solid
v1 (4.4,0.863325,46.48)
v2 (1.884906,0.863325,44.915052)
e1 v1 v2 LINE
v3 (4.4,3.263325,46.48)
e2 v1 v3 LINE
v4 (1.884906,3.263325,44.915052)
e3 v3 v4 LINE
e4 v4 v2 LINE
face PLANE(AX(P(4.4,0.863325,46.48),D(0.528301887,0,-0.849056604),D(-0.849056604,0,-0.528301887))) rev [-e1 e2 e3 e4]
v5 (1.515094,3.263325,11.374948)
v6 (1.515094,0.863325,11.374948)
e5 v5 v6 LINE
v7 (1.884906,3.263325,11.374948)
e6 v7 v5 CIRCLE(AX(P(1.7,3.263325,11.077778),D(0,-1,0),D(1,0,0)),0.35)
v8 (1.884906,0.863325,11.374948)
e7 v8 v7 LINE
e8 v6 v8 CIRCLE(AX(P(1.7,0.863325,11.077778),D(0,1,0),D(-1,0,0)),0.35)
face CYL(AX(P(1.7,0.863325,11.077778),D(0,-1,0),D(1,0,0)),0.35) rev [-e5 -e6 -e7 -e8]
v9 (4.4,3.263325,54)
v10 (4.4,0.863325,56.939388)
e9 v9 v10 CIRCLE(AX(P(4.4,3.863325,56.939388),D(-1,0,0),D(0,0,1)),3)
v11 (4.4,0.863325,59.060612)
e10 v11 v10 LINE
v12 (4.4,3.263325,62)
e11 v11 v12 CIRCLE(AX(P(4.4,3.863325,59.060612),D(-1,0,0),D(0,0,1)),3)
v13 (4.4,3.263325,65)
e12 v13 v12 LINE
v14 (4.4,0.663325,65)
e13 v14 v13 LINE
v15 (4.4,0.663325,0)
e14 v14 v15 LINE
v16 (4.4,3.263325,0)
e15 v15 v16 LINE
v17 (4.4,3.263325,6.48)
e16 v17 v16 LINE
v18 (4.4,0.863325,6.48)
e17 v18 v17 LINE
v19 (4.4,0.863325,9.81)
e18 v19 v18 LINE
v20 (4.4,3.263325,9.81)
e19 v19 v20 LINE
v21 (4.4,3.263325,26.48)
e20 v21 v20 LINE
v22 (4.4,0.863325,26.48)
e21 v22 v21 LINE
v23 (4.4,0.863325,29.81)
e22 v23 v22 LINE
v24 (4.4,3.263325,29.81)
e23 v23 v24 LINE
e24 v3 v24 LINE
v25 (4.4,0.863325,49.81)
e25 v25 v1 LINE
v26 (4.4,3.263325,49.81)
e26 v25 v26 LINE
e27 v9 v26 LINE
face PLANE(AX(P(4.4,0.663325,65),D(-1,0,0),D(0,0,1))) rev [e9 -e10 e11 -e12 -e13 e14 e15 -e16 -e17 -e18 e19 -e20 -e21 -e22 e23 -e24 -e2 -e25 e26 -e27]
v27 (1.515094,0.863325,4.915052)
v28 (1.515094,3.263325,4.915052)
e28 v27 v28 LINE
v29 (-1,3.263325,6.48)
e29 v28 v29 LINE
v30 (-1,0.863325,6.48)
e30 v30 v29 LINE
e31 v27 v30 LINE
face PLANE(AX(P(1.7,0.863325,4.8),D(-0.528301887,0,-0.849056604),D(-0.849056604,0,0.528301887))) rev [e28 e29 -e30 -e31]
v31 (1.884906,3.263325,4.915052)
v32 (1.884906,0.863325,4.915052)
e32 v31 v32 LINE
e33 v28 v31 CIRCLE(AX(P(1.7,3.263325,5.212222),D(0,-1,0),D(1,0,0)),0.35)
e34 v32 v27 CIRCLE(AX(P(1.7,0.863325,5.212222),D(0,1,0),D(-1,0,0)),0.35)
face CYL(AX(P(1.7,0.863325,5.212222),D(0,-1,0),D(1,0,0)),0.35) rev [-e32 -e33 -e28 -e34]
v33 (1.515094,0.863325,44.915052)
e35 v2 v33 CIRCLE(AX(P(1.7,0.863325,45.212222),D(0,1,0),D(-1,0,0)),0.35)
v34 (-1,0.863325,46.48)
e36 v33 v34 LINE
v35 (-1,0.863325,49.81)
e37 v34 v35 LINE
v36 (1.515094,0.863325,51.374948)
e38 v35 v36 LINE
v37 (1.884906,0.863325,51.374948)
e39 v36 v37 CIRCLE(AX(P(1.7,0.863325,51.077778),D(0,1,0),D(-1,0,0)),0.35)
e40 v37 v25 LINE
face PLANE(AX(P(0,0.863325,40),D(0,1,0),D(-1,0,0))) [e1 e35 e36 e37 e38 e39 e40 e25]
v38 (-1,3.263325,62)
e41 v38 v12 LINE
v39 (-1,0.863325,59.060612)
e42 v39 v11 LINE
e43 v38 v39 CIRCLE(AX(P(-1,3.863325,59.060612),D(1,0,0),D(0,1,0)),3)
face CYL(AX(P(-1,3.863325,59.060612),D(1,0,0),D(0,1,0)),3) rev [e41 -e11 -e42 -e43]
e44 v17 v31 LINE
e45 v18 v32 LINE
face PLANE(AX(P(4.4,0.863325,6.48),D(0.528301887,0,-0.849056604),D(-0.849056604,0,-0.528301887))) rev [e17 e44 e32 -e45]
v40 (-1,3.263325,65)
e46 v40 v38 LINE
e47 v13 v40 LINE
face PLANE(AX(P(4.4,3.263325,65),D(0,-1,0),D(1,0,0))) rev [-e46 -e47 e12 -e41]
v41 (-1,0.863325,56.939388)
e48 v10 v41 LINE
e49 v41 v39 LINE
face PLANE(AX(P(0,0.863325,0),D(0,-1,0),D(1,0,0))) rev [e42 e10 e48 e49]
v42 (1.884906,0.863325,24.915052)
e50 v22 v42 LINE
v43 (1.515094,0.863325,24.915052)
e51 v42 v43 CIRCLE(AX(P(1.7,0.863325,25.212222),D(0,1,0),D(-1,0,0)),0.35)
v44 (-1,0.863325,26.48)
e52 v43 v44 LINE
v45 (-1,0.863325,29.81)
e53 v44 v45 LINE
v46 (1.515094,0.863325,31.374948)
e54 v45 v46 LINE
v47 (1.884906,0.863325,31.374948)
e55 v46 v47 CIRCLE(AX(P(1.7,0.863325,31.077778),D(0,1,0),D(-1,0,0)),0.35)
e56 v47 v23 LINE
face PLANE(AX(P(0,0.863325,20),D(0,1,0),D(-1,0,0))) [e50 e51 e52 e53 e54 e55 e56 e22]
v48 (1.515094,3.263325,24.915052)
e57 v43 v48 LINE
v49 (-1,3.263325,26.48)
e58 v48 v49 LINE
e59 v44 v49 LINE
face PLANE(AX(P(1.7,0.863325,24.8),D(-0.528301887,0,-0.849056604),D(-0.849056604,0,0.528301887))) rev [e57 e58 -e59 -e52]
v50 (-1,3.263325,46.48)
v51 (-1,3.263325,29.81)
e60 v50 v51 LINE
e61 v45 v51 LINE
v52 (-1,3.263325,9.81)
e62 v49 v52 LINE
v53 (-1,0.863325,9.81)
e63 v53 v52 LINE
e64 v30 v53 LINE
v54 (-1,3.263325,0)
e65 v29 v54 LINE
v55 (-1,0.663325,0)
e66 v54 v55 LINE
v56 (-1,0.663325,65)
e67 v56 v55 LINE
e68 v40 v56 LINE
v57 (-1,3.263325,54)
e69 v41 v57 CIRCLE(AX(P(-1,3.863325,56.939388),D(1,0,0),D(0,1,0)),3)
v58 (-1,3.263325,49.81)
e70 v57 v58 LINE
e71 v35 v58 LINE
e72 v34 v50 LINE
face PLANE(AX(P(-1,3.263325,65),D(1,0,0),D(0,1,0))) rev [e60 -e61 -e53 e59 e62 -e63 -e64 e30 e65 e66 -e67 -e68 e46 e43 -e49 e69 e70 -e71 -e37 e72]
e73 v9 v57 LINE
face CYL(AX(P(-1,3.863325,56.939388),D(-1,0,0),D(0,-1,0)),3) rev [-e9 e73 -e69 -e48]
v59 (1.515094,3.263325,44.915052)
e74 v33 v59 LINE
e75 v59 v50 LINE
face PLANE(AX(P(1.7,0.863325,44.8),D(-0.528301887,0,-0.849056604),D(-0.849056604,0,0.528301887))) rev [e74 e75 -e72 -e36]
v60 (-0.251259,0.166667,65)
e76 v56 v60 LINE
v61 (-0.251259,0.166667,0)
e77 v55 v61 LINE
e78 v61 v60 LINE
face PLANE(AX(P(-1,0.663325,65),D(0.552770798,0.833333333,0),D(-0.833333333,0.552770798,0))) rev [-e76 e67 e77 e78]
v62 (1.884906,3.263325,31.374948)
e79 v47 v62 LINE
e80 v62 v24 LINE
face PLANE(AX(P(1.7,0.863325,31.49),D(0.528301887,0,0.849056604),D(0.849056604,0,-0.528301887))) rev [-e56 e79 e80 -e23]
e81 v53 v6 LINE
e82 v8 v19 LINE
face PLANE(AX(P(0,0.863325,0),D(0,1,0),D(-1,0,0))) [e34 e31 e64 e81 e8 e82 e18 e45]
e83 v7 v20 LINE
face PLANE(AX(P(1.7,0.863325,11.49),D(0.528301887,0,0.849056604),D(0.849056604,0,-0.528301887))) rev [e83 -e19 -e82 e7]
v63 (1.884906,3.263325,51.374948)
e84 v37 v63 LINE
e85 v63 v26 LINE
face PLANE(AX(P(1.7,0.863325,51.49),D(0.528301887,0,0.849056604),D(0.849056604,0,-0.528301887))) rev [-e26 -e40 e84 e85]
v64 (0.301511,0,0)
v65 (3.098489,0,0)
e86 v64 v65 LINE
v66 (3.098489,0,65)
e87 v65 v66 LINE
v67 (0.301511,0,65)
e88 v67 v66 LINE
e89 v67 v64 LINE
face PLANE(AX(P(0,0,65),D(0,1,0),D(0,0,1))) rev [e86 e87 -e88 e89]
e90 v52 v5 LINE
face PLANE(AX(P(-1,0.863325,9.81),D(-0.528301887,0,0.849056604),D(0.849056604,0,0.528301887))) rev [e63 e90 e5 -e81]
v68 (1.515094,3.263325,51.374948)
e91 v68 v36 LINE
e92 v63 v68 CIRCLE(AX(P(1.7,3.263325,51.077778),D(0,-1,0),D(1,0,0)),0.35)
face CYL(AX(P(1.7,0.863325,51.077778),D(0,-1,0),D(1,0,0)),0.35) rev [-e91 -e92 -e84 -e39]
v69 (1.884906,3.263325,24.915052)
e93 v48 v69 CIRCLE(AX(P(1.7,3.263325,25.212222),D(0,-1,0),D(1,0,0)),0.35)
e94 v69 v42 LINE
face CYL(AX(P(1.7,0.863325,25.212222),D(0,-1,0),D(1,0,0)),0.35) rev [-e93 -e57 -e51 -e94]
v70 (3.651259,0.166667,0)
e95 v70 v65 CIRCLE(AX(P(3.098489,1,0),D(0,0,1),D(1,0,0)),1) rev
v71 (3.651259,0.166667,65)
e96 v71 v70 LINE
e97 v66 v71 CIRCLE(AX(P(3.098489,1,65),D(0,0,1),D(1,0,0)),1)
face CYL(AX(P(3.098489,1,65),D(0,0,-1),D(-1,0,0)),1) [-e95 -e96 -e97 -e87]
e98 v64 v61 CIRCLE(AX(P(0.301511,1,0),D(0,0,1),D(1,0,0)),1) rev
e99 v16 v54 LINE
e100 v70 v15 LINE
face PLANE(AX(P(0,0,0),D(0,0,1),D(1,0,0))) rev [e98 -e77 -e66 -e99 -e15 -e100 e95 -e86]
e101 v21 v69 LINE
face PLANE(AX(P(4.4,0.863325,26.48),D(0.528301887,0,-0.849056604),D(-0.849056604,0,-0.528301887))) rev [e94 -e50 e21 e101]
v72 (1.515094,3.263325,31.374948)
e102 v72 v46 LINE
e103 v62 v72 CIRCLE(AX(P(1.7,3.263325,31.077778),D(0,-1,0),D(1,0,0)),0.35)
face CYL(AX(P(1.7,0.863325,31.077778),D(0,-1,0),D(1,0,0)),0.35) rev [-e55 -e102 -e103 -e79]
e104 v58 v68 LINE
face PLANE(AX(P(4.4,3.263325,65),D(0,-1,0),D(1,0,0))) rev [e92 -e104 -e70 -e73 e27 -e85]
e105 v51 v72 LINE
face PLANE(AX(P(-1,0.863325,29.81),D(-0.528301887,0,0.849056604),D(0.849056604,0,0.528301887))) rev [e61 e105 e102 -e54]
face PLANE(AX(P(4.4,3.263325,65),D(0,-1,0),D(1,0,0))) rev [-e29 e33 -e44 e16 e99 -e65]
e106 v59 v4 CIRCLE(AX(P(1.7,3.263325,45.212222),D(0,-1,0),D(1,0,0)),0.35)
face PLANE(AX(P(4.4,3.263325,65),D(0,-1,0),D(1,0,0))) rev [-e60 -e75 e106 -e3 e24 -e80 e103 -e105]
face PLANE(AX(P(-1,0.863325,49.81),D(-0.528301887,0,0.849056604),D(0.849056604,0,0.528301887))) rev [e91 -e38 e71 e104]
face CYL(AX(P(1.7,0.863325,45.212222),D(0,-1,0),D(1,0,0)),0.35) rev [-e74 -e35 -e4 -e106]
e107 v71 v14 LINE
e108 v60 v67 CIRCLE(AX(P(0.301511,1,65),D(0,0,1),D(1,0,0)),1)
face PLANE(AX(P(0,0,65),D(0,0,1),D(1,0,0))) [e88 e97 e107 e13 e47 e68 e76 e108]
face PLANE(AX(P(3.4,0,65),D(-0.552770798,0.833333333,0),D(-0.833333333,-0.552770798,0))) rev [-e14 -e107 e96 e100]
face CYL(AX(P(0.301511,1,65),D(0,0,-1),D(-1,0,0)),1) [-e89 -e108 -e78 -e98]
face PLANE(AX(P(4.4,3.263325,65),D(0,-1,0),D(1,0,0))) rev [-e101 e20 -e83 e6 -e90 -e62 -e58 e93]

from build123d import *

# Parameters (mm, degrees)
BOSS_EXTRUDE1_DEPTH = 65
FILLET3_R           = 1
FILLET4_R           = 1
CUT_EXTRUDE1_DEPTH  = 2.4
LPATTERN1_COUNT     = 3
LPATTERN1_PITCH     = 20
SKETCH3_W           = 5.4
SKETCH3_H           = 8
CUT_EXTRUDE2_DEPTH  = 2.4
FILLET5_R           = 3
FILLET6_R           = 0.35


with BuildPart() as part:
    # Sketch1 → Boss-Extrude1 (new body)
    with BuildSketch(Plane.XY):
        Polygon((0, 0), (3.4, 0), (4.4, 0.663324958), (4.4, 3.263324958), (-1, 3.263324958), (-1, 0.663324958), align=None)
    extrude(amount=BOSS_EXTRUDE1_DEPTH)

    # Fillet3
    fillet3_edges = [part.edges().sort_by_distance(p)[0] for p in [
        (3.4, 0, 32.5),
    ]]
    fillet(fillet3_edges, radius=FILLET3_R)

    # Fillet4
    fillet4_edges = [part.edges().sort_by_distance(p)[0] for p in [
        (0, 0, 32.5),
    ]]
    fillet(fillet4_edges, radius=FILLET4_R)

    # Sketch2 → Cut-Extrude1 (cut)
    with BuildSketch(Plane(origin=(0, 3.263324958, 0), x_dir=(1, 0, 0), z_dir=(0, 1, 0))):
        Polygon((4.4, -9.81), (4.4, -6.48), (1.7, -4.8), (-1, -6.48), (-1, -9.81), (1.7, -11.49), align=None)
    cut_extrude1 = extrude(amount=-CUT_EXTRUDE1_DEPTH, mode=Mode.SUBTRACT)

    # LPattern1: Cut-Extrude1 ×3
    with Locations(*[(0, 0, i * LPATTERN1_PITCH) for i in range(1, LPATTERN1_COUNT)]):
        add(cut_extrude1, mode=Mode.SUBTRACT)

    # Sketch3 → Cut-Extrude2 (cut)
    with BuildSketch(Plane(origin=(0, 3.263324958, 0), x_dir=(1, 0, 0), z_dir=(0, 1, 0))):
        with Locations((1.7, -58)):
            Rectangle(SKETCH3_W, SKETCH3_H)
    extrude(amount=-CUT_EXTRUDE2_DEPTH, mode=Mode.SUBTRACT)

    # Fillet5
    # the kernel refuses this fillet: 3 mm, written as the material it adds along each edge
    with BuildSketch(Plane(origin=(4.4, 0.863324958, 54), x_dir=(0, 0, 1), z_dir=(-1, 0, 0))) as fillet5_piece_1:
        with BuildLine():
            CenterArc((2.939387691, 3), FILLET5_R, 191.536959033, 78.463040967)
            Line((0, 2.4), (-0.058787754, 2.388))
            ThreePointArc((-0.058787754, 2.388), (-0.06, 1.2), (-0.06, 0))
            Line((-0.06, 0), (0, -0.06))
            Line((0, -0.06), (2.939387691, -0.06))
            Line((2.939387691, -0.06), (2.939387691, 0))
        make_face()
    extrude(amount=5.4)
    with BuildSketch(Plane(origin=(-1, 0.863324958, 62), x_dir=(0, 1.0, -1.5483910450100627e-12), z_dir=(1, 0, 0))) as fillet5_piece_2:
        with BuildLine():
            CenterArc((3, -2.939387691), FILLET5_R, 101.536959033, 78.463040967)
            Line((0, -2.939387691), (-0.06, -2.939387691))
            Line((-0.06, -2.939387691), (-0.06, 0))
            Line((-0.06, 0), (0, 0.06))
            ThreePointArc((0, 0.06), (1.2, 0.06), (2.388, 0.058787754))
            Line((2.388, 0.058787754), (2.4, 0))
        make_face()
    extrude(amount=5.4)

    # Fillet6
    fillet6_edges = [part.edges().sort_by_distance(p)[0] for p in [
        (1.7, 2.063324958, 11.49),
        (1.7, 2.063324958, 4.8),
        (1.7, 2.063324958, 31.49),
        (1.7, 2.063324958, 24.8),
        (1.7, 2.063324958, 51.49),
        (1.7, 2.063324958, 44.8),
    ]]
    fillet(fillet6_edges, radius=FILLET6_R)


solid = part.part
